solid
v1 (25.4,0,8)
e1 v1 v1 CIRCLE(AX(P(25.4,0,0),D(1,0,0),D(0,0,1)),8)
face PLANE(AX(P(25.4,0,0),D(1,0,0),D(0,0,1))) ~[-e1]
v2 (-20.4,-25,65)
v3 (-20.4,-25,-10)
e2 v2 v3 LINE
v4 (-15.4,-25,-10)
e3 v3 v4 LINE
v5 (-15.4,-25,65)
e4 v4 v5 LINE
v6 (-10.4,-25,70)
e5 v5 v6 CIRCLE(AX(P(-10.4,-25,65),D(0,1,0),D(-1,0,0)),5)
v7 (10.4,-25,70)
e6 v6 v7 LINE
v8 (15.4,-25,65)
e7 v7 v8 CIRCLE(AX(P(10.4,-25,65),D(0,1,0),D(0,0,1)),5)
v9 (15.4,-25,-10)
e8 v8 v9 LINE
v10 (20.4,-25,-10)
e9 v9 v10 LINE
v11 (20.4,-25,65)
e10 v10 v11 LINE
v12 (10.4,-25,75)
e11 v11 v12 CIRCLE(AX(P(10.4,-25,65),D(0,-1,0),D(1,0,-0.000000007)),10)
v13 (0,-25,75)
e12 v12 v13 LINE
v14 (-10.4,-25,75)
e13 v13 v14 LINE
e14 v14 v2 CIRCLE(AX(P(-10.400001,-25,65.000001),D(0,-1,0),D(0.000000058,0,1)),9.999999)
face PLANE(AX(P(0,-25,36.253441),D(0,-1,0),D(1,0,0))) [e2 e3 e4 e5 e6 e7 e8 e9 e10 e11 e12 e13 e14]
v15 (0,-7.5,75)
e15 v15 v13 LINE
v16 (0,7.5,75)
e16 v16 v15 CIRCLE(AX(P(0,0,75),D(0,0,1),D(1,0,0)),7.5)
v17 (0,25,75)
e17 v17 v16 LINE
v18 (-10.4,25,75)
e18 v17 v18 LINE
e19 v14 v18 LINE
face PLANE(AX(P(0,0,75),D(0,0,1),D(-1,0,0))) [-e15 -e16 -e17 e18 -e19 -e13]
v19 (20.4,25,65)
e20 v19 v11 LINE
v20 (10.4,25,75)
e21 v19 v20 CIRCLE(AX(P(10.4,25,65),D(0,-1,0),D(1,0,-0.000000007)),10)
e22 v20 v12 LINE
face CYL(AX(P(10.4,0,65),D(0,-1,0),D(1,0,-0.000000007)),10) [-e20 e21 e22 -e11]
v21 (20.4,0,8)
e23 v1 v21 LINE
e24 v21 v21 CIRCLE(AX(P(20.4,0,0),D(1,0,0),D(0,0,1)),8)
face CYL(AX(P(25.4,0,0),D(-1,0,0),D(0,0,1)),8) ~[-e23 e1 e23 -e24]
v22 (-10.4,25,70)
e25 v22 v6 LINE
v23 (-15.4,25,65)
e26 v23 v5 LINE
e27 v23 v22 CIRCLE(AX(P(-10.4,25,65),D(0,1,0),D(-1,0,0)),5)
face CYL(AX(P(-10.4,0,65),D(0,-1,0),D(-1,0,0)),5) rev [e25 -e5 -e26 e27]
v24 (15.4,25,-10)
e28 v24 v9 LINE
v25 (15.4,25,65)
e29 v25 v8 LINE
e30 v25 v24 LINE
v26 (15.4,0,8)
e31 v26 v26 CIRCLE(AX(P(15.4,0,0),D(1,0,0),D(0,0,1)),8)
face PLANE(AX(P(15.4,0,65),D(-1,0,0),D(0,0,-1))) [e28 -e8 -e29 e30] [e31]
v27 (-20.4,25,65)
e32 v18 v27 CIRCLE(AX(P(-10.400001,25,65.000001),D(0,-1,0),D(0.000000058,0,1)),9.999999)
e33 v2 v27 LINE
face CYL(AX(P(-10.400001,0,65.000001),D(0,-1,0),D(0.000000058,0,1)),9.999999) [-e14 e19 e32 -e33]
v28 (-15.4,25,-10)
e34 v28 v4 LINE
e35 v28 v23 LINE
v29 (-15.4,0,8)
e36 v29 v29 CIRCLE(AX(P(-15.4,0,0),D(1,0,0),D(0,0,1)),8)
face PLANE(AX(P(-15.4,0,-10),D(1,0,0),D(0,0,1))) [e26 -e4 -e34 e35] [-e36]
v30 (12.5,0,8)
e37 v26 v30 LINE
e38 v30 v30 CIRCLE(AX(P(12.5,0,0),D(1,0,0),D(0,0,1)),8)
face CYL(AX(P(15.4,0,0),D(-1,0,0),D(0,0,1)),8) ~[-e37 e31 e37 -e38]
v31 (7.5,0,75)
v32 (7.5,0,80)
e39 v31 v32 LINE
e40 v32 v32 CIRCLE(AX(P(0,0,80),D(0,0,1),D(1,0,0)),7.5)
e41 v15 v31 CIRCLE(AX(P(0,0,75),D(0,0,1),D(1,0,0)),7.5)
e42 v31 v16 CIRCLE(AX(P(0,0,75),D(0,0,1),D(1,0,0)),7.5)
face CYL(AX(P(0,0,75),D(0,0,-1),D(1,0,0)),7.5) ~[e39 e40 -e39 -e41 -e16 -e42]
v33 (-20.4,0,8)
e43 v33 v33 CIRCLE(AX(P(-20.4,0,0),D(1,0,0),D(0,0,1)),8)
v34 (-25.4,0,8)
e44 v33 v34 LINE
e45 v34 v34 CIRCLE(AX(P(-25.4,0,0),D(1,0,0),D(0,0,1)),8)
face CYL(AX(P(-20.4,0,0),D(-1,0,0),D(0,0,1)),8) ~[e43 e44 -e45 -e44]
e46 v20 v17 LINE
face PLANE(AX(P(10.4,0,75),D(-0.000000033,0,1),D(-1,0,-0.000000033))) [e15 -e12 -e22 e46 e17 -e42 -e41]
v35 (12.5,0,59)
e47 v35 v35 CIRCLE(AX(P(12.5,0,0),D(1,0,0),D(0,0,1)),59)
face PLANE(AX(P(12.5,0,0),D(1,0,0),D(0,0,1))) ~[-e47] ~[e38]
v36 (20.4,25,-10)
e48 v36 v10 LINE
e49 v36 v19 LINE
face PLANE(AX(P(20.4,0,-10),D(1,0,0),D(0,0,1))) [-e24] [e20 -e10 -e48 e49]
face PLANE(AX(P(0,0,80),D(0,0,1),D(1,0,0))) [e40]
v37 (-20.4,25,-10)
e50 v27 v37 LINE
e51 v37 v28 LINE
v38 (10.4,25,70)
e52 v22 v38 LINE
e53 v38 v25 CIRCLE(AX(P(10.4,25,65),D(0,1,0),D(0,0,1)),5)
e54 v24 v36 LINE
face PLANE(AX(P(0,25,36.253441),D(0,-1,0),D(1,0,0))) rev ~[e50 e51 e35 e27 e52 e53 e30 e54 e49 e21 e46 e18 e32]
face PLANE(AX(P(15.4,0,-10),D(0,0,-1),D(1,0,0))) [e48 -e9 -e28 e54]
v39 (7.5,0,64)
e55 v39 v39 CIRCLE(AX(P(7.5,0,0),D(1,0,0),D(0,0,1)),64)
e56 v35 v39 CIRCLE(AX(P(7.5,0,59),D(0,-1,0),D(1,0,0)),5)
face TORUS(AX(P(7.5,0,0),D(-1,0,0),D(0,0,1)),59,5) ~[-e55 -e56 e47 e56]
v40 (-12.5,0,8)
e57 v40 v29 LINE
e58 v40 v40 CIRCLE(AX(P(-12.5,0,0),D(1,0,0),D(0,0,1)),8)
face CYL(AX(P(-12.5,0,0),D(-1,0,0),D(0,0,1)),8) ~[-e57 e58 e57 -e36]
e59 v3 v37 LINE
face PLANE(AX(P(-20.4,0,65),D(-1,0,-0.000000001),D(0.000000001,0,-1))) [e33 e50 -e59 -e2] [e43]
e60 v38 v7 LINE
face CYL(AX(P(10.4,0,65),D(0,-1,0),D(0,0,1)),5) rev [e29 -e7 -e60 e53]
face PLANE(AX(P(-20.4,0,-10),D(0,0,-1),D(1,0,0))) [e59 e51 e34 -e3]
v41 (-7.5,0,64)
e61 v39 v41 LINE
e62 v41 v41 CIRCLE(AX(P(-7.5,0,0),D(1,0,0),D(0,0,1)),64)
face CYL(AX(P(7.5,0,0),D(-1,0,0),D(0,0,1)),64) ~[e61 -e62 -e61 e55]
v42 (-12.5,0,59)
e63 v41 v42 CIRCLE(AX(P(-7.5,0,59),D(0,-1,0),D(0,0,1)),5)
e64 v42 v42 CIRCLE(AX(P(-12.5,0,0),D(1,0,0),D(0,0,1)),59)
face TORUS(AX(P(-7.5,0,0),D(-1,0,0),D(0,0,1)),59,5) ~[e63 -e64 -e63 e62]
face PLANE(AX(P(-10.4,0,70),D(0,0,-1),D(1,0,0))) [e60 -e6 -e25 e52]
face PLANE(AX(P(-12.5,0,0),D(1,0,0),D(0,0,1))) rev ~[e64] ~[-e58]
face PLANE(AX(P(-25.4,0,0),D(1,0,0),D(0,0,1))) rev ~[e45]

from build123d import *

# Parameters (mm, degrees)
F3_DEPTH = 25
F4_R     = 7.5
F5_DEPTH = 5


# Not quite as in the source:
# - ends of sketch curves that miss each other by under 0.0002 mm in the source are joined


with BuildPart() as f1:
    # F0 (on Front) → F1 (revolve)
    with BuildSketch(Plane.XZ):
        with BuildLine():
            Line((-20.4, 8), (-25.4, 8))
            Line((-25.4, 8), (-25.4, 0))
            Line((-25.4, 0), (-12.5, 0))
            Line((-12.5, 0), (12.5, 0))
            Line((12.5, 0), (25.4, 0))
            Line((25.4, 0), (25.4, 8))
            Line((25.4, 8), (20.4, 8))
            Line((20.4, 8), (20.4, 5))
            Line((20.4, 5), (15.4, 5))
            Line((15.4, 5), (15.4, 8))
            Line((15.4, 8), (12.5, 8))
            Line((12.5, 8), (12.5, 59))
            ThreePointArc((12.5, 59), (11.0355339059, 62.5355339059), (7.5, 64))
            Line((7.5, 64), (-7.5, 64))
            ThreePointArc((-7.5, 64), (-11.0355339059, 62.5355339059), (-12.5, 59))
            Line((-12.5, 59), (-12.5, 8))
            Line((-12.5, 8), (-15.4, 8))
            Line((-15.4, 8), (-15.4, 5))
            Line((-15.4, 5), (-20.4, 5))
            Line((-20.4, 5), (-20.4, 8))
        make_face()
    revolve(axis=Axis((-6.7645025283, 0, 0), (1, 0, 0)))

    # F2 (on Front) → F3 (join, symmetric)
    with BuildSketch(Plane.XZ):
        with BuildLine():
            Line((-20.4, -10), (-15.4, -10))
            Line((-15.4, -10), (-15.4, 65.000000298))
            ThreePointArc((-15.4, 65.000000298), (-13.9355339059, 68.535534204), (-10.4, 70.000000298))
            Line((-10.4, 70.000000298), (0, 70.000000298))
            Line((0, 70.000000298), (10.4, 70.000000298))
            ThreePointArc((10.4, 70.000000298), (13.9355339059, 68.535534204), (15.4, 65.000000298))
            Line((15.4, 65.000000298), (15.4, -10))
            Line((15.4, -10), (20.4, -10))
            Line((20.4, -10), (20.4, 65.000000298))
            ThreePointArc((20.4, 65.000000298), (17.4710678407, 72.0710681387), (10.4, 75.0000003388))
            Line((10.4, 75.0000003388), (0, 75))
            Line((0, 75), (-10.4, 75))
            ThreePointArc((-10.4, 75), (-17.4710678407, 72.0710681387), (-20.4000000408, 65.000000298))
            Line((-20.4000000408, 65.000000298), (-20.4, -10))
        make_face()
    extrude(amount=F3_DEPTH, both=True)

    # F4 (on face) → F5 (join)
    with BuildSketch(Plane.XY.offset(75)):
        Circle(F4_R)
    extrude(amount=F5_DEPTH)


solid = f1.part
